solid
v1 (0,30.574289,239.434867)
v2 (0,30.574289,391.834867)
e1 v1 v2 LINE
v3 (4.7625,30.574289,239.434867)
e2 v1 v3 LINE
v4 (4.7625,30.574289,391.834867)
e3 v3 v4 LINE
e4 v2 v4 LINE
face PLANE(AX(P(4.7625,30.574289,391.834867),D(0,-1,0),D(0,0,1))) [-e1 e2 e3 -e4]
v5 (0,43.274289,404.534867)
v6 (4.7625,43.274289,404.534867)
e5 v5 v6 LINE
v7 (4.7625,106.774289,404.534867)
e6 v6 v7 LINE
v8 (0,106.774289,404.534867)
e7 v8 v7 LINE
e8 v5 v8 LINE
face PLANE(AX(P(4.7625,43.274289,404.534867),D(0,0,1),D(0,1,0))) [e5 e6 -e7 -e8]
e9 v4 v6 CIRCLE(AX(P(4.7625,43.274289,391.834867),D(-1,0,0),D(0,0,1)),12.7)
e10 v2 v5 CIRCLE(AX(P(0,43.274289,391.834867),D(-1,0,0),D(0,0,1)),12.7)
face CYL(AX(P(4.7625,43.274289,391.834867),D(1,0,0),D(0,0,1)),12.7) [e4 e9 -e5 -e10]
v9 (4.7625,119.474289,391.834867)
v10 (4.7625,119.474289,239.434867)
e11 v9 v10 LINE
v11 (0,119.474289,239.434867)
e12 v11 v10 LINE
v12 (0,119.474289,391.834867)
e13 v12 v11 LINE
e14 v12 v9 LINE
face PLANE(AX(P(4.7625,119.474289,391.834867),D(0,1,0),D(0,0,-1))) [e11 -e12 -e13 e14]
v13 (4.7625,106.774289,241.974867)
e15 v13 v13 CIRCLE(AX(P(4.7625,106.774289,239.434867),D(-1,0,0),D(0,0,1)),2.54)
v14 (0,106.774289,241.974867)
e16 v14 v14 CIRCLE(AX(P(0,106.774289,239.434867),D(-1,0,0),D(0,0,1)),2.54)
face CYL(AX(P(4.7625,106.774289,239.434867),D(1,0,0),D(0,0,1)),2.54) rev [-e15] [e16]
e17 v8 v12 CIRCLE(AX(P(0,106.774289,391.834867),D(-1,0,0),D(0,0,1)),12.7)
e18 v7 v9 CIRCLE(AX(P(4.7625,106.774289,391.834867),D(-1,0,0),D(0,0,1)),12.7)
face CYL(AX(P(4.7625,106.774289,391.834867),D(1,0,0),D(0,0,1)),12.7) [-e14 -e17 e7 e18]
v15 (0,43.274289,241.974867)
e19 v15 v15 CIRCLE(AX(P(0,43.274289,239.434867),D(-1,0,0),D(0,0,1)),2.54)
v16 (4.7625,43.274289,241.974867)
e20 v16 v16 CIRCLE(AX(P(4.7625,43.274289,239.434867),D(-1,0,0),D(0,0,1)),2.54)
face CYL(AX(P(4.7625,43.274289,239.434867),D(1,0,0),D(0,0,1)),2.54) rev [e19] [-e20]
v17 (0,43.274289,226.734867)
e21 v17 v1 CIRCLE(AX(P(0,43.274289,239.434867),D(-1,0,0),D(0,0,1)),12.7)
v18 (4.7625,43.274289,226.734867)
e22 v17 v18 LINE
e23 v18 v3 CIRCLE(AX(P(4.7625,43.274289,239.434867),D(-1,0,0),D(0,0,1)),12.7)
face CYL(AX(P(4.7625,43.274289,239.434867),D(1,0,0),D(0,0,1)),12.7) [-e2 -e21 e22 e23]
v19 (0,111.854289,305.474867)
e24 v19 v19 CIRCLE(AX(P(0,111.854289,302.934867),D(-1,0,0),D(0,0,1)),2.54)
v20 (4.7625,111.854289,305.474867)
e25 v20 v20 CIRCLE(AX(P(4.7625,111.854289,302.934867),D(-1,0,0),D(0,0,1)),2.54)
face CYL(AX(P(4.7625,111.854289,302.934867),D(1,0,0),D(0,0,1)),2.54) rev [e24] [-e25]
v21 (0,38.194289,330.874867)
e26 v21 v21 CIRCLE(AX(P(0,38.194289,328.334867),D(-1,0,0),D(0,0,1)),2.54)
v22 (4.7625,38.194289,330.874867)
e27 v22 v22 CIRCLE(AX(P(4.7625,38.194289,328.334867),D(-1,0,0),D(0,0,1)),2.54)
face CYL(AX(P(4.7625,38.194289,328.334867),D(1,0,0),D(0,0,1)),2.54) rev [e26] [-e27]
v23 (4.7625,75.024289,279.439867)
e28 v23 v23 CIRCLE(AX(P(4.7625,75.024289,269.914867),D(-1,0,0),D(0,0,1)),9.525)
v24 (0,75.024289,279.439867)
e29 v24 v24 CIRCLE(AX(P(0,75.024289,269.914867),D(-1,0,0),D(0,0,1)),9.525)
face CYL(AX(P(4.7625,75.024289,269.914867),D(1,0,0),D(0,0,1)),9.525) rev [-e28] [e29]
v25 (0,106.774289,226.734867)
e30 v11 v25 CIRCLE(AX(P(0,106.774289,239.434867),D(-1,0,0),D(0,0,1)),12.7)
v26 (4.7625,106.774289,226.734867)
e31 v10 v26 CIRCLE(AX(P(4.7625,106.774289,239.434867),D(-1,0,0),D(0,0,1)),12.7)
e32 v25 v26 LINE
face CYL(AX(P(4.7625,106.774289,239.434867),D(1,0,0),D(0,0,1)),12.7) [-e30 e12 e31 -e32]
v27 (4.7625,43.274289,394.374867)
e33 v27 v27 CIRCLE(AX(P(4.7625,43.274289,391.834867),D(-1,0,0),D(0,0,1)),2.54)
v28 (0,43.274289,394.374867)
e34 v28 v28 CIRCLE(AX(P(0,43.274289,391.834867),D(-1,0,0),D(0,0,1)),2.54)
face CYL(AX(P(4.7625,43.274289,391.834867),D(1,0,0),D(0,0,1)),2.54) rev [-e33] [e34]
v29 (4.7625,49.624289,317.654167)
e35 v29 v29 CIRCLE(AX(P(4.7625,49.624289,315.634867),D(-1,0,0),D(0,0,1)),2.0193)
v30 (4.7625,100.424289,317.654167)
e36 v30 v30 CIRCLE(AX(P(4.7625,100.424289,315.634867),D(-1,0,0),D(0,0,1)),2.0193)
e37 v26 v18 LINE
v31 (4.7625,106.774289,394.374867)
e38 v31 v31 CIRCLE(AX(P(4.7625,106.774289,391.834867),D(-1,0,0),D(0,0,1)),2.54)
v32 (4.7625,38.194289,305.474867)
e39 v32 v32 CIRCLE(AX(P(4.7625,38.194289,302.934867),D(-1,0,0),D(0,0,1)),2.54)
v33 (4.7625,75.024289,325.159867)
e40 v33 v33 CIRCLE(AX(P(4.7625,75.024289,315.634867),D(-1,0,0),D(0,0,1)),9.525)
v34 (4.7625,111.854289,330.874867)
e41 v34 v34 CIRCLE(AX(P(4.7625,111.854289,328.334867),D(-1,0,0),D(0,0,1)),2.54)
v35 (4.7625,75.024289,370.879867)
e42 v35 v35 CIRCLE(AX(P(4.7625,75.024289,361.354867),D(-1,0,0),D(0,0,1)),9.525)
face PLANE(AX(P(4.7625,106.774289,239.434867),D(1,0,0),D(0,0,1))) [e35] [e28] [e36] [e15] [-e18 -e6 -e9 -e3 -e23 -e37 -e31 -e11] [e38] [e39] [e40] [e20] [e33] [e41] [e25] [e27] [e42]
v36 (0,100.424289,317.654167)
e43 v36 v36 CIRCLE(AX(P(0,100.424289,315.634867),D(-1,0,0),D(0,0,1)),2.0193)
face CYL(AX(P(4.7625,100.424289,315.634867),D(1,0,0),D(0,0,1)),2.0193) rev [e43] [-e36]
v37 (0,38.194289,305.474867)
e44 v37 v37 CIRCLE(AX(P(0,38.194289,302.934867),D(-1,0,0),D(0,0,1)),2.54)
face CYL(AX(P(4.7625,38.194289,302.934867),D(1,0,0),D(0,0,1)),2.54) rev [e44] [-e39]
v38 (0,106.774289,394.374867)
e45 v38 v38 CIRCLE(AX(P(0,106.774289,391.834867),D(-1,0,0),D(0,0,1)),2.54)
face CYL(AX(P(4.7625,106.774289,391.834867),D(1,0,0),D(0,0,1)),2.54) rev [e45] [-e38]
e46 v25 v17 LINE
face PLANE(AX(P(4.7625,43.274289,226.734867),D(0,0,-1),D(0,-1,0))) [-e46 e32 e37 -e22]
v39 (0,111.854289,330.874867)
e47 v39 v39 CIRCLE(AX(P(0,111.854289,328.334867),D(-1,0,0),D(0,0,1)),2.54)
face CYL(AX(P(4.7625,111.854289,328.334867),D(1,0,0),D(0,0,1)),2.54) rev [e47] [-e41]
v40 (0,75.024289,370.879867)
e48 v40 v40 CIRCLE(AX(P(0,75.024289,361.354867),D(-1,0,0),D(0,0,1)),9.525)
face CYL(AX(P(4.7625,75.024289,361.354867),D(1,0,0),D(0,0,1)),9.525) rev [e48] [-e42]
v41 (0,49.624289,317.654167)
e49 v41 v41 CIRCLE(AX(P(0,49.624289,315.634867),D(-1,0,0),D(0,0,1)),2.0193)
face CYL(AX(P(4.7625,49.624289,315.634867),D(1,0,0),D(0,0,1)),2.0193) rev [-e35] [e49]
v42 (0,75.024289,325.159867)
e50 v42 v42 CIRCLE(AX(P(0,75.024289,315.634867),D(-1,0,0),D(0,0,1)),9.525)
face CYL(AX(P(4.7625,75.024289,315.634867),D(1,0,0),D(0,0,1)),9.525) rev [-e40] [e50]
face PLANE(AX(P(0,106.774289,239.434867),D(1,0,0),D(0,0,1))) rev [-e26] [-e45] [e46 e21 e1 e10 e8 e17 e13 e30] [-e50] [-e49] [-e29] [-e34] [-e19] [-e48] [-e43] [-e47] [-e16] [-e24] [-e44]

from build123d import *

# Parameters (mm, degrees)
SKETCH1_R           = 2.54
SKETCH1_R_2         = 2.0193
SKETCH1_R_3         = 9.525
BOSS_EXTRUDE1_DEPTH = 4.7625


with BuildPart() as part:
    # Sketch1 → Boss-Extrude1 (new body)
    with BuildSketch(Plane(origin=(0, 0, 0), x_dir=(0, 0, -1), z_dir=(1, 0, 0))):
        with BuildLine():
            Line((226.734866781, 43.274288567), (226.734866781, 106.774288567))
            ThreePointArc((226.734866781, 106.774288567), (230.45461066, 115.754544688), (239.434866781, 119.474288567))
            Line((239.434866781, 119.474288567), (391.834866781, 119.474288567))
            ThreePointArc((391.834866781, 119.474288567), (400.815122902, 115.754544688), (404.534866781, 106.774288567))
            Line((404.534866781, 106.774288567), (404.534866781, 43.274288567))
            ThreePointArc((404.534866781, 43.274288567), (400.815122902, 34.294032445), (391.834866781, 30.574288567))
            Line((391.834866781, 30.574288567), (239.434866781, 30.574288567))
            ThreePointArc((239.434866781, 30.574288567), (230.45461066, 34.294032445), (226.734866781, 43.274288567))
        make_face()
        with Locations(Location((302.934866781, 111.854288567, 0), (0, 0, 180))):
            Circle(SKETCH1_R, mode=Mode.SUBTRACT)
        with Locations(Location((328.334866781, 111.854288567, 0), (0, 0, 180))):
            Circle(SKETCH1_R, mode=Mode.SUBTRACT)
        with Locations(Location((315.634866781, 100.424288567, 0), (0, 0, 180))):
            Circle(SKETCH1_R_2, mode=Mode.SUBTRACT)
        with Locations(Location((302.934866781, 38.194288567, 0), (0, 0, 180))):
            Circle(SKETCH1_R, mode=Mode.SUBTRACT)
        with Locations(Location((328.334866781, 38.194288567, 0), (0, 0, 180))):
            Circle(SKETCH1_R, mode=Mode.SUBTRACT)
        with Locations(Location((239.434866781, 43.274288567, 0), (0, 0, 180))):
            Circle(SKETCH1_R, mode=Mode.SUBTRACT)
        with Locations(Location((391.834866781, 43.274288567, 0), (0, 0, 180))):
            Circle(SKETCH1_R, mode=Mode.SUBTRACT)
        with Locations(Location((315.634866781, 75.024288567, 0), (0, 0, 180))):
            Circle(SKETCH1_R_3, mode=Mode.SUBTRACT)
        with Locations(Location((315.634866781, 49.624288567, 0), (0, 0, 180))):
            Circle(SKETCH1_R_2, mode=Mode.SUBTRACT)
        with Locations(Location((239.434866781, 106.774288567, 0), (0, 0, 180))):
            Circle(SKETCH1_R, mode=Mode.SUBTRACT)
        with Locations(Location((391.834866781, 106.774288567, 0), (0, 0, 180))):
            Circle(SKETCH1_R, mode=Mode.SUBTRACT)
        with Locations(Location((269.914866781, 75.024288567, 0), (0, 0, 180))):
            Circle(SKETCH1_R_3, mode=Mode.SUBTRACT)
        with Locations(Location((361.354866781, 75.024288567, 0), (0, 0, 180))):
            Circle(SKETCH1_R_3, mode=Mode.SUBTRACT)
    extrude(amount=BOSS_EXTRUDE1_DEPTH)


with BuildPart() as part_1:
    # Body-Move/Copy1: moved
    add(part.part.moved(Location((0, 0, 631.269733563))))


solid = part_1.part
